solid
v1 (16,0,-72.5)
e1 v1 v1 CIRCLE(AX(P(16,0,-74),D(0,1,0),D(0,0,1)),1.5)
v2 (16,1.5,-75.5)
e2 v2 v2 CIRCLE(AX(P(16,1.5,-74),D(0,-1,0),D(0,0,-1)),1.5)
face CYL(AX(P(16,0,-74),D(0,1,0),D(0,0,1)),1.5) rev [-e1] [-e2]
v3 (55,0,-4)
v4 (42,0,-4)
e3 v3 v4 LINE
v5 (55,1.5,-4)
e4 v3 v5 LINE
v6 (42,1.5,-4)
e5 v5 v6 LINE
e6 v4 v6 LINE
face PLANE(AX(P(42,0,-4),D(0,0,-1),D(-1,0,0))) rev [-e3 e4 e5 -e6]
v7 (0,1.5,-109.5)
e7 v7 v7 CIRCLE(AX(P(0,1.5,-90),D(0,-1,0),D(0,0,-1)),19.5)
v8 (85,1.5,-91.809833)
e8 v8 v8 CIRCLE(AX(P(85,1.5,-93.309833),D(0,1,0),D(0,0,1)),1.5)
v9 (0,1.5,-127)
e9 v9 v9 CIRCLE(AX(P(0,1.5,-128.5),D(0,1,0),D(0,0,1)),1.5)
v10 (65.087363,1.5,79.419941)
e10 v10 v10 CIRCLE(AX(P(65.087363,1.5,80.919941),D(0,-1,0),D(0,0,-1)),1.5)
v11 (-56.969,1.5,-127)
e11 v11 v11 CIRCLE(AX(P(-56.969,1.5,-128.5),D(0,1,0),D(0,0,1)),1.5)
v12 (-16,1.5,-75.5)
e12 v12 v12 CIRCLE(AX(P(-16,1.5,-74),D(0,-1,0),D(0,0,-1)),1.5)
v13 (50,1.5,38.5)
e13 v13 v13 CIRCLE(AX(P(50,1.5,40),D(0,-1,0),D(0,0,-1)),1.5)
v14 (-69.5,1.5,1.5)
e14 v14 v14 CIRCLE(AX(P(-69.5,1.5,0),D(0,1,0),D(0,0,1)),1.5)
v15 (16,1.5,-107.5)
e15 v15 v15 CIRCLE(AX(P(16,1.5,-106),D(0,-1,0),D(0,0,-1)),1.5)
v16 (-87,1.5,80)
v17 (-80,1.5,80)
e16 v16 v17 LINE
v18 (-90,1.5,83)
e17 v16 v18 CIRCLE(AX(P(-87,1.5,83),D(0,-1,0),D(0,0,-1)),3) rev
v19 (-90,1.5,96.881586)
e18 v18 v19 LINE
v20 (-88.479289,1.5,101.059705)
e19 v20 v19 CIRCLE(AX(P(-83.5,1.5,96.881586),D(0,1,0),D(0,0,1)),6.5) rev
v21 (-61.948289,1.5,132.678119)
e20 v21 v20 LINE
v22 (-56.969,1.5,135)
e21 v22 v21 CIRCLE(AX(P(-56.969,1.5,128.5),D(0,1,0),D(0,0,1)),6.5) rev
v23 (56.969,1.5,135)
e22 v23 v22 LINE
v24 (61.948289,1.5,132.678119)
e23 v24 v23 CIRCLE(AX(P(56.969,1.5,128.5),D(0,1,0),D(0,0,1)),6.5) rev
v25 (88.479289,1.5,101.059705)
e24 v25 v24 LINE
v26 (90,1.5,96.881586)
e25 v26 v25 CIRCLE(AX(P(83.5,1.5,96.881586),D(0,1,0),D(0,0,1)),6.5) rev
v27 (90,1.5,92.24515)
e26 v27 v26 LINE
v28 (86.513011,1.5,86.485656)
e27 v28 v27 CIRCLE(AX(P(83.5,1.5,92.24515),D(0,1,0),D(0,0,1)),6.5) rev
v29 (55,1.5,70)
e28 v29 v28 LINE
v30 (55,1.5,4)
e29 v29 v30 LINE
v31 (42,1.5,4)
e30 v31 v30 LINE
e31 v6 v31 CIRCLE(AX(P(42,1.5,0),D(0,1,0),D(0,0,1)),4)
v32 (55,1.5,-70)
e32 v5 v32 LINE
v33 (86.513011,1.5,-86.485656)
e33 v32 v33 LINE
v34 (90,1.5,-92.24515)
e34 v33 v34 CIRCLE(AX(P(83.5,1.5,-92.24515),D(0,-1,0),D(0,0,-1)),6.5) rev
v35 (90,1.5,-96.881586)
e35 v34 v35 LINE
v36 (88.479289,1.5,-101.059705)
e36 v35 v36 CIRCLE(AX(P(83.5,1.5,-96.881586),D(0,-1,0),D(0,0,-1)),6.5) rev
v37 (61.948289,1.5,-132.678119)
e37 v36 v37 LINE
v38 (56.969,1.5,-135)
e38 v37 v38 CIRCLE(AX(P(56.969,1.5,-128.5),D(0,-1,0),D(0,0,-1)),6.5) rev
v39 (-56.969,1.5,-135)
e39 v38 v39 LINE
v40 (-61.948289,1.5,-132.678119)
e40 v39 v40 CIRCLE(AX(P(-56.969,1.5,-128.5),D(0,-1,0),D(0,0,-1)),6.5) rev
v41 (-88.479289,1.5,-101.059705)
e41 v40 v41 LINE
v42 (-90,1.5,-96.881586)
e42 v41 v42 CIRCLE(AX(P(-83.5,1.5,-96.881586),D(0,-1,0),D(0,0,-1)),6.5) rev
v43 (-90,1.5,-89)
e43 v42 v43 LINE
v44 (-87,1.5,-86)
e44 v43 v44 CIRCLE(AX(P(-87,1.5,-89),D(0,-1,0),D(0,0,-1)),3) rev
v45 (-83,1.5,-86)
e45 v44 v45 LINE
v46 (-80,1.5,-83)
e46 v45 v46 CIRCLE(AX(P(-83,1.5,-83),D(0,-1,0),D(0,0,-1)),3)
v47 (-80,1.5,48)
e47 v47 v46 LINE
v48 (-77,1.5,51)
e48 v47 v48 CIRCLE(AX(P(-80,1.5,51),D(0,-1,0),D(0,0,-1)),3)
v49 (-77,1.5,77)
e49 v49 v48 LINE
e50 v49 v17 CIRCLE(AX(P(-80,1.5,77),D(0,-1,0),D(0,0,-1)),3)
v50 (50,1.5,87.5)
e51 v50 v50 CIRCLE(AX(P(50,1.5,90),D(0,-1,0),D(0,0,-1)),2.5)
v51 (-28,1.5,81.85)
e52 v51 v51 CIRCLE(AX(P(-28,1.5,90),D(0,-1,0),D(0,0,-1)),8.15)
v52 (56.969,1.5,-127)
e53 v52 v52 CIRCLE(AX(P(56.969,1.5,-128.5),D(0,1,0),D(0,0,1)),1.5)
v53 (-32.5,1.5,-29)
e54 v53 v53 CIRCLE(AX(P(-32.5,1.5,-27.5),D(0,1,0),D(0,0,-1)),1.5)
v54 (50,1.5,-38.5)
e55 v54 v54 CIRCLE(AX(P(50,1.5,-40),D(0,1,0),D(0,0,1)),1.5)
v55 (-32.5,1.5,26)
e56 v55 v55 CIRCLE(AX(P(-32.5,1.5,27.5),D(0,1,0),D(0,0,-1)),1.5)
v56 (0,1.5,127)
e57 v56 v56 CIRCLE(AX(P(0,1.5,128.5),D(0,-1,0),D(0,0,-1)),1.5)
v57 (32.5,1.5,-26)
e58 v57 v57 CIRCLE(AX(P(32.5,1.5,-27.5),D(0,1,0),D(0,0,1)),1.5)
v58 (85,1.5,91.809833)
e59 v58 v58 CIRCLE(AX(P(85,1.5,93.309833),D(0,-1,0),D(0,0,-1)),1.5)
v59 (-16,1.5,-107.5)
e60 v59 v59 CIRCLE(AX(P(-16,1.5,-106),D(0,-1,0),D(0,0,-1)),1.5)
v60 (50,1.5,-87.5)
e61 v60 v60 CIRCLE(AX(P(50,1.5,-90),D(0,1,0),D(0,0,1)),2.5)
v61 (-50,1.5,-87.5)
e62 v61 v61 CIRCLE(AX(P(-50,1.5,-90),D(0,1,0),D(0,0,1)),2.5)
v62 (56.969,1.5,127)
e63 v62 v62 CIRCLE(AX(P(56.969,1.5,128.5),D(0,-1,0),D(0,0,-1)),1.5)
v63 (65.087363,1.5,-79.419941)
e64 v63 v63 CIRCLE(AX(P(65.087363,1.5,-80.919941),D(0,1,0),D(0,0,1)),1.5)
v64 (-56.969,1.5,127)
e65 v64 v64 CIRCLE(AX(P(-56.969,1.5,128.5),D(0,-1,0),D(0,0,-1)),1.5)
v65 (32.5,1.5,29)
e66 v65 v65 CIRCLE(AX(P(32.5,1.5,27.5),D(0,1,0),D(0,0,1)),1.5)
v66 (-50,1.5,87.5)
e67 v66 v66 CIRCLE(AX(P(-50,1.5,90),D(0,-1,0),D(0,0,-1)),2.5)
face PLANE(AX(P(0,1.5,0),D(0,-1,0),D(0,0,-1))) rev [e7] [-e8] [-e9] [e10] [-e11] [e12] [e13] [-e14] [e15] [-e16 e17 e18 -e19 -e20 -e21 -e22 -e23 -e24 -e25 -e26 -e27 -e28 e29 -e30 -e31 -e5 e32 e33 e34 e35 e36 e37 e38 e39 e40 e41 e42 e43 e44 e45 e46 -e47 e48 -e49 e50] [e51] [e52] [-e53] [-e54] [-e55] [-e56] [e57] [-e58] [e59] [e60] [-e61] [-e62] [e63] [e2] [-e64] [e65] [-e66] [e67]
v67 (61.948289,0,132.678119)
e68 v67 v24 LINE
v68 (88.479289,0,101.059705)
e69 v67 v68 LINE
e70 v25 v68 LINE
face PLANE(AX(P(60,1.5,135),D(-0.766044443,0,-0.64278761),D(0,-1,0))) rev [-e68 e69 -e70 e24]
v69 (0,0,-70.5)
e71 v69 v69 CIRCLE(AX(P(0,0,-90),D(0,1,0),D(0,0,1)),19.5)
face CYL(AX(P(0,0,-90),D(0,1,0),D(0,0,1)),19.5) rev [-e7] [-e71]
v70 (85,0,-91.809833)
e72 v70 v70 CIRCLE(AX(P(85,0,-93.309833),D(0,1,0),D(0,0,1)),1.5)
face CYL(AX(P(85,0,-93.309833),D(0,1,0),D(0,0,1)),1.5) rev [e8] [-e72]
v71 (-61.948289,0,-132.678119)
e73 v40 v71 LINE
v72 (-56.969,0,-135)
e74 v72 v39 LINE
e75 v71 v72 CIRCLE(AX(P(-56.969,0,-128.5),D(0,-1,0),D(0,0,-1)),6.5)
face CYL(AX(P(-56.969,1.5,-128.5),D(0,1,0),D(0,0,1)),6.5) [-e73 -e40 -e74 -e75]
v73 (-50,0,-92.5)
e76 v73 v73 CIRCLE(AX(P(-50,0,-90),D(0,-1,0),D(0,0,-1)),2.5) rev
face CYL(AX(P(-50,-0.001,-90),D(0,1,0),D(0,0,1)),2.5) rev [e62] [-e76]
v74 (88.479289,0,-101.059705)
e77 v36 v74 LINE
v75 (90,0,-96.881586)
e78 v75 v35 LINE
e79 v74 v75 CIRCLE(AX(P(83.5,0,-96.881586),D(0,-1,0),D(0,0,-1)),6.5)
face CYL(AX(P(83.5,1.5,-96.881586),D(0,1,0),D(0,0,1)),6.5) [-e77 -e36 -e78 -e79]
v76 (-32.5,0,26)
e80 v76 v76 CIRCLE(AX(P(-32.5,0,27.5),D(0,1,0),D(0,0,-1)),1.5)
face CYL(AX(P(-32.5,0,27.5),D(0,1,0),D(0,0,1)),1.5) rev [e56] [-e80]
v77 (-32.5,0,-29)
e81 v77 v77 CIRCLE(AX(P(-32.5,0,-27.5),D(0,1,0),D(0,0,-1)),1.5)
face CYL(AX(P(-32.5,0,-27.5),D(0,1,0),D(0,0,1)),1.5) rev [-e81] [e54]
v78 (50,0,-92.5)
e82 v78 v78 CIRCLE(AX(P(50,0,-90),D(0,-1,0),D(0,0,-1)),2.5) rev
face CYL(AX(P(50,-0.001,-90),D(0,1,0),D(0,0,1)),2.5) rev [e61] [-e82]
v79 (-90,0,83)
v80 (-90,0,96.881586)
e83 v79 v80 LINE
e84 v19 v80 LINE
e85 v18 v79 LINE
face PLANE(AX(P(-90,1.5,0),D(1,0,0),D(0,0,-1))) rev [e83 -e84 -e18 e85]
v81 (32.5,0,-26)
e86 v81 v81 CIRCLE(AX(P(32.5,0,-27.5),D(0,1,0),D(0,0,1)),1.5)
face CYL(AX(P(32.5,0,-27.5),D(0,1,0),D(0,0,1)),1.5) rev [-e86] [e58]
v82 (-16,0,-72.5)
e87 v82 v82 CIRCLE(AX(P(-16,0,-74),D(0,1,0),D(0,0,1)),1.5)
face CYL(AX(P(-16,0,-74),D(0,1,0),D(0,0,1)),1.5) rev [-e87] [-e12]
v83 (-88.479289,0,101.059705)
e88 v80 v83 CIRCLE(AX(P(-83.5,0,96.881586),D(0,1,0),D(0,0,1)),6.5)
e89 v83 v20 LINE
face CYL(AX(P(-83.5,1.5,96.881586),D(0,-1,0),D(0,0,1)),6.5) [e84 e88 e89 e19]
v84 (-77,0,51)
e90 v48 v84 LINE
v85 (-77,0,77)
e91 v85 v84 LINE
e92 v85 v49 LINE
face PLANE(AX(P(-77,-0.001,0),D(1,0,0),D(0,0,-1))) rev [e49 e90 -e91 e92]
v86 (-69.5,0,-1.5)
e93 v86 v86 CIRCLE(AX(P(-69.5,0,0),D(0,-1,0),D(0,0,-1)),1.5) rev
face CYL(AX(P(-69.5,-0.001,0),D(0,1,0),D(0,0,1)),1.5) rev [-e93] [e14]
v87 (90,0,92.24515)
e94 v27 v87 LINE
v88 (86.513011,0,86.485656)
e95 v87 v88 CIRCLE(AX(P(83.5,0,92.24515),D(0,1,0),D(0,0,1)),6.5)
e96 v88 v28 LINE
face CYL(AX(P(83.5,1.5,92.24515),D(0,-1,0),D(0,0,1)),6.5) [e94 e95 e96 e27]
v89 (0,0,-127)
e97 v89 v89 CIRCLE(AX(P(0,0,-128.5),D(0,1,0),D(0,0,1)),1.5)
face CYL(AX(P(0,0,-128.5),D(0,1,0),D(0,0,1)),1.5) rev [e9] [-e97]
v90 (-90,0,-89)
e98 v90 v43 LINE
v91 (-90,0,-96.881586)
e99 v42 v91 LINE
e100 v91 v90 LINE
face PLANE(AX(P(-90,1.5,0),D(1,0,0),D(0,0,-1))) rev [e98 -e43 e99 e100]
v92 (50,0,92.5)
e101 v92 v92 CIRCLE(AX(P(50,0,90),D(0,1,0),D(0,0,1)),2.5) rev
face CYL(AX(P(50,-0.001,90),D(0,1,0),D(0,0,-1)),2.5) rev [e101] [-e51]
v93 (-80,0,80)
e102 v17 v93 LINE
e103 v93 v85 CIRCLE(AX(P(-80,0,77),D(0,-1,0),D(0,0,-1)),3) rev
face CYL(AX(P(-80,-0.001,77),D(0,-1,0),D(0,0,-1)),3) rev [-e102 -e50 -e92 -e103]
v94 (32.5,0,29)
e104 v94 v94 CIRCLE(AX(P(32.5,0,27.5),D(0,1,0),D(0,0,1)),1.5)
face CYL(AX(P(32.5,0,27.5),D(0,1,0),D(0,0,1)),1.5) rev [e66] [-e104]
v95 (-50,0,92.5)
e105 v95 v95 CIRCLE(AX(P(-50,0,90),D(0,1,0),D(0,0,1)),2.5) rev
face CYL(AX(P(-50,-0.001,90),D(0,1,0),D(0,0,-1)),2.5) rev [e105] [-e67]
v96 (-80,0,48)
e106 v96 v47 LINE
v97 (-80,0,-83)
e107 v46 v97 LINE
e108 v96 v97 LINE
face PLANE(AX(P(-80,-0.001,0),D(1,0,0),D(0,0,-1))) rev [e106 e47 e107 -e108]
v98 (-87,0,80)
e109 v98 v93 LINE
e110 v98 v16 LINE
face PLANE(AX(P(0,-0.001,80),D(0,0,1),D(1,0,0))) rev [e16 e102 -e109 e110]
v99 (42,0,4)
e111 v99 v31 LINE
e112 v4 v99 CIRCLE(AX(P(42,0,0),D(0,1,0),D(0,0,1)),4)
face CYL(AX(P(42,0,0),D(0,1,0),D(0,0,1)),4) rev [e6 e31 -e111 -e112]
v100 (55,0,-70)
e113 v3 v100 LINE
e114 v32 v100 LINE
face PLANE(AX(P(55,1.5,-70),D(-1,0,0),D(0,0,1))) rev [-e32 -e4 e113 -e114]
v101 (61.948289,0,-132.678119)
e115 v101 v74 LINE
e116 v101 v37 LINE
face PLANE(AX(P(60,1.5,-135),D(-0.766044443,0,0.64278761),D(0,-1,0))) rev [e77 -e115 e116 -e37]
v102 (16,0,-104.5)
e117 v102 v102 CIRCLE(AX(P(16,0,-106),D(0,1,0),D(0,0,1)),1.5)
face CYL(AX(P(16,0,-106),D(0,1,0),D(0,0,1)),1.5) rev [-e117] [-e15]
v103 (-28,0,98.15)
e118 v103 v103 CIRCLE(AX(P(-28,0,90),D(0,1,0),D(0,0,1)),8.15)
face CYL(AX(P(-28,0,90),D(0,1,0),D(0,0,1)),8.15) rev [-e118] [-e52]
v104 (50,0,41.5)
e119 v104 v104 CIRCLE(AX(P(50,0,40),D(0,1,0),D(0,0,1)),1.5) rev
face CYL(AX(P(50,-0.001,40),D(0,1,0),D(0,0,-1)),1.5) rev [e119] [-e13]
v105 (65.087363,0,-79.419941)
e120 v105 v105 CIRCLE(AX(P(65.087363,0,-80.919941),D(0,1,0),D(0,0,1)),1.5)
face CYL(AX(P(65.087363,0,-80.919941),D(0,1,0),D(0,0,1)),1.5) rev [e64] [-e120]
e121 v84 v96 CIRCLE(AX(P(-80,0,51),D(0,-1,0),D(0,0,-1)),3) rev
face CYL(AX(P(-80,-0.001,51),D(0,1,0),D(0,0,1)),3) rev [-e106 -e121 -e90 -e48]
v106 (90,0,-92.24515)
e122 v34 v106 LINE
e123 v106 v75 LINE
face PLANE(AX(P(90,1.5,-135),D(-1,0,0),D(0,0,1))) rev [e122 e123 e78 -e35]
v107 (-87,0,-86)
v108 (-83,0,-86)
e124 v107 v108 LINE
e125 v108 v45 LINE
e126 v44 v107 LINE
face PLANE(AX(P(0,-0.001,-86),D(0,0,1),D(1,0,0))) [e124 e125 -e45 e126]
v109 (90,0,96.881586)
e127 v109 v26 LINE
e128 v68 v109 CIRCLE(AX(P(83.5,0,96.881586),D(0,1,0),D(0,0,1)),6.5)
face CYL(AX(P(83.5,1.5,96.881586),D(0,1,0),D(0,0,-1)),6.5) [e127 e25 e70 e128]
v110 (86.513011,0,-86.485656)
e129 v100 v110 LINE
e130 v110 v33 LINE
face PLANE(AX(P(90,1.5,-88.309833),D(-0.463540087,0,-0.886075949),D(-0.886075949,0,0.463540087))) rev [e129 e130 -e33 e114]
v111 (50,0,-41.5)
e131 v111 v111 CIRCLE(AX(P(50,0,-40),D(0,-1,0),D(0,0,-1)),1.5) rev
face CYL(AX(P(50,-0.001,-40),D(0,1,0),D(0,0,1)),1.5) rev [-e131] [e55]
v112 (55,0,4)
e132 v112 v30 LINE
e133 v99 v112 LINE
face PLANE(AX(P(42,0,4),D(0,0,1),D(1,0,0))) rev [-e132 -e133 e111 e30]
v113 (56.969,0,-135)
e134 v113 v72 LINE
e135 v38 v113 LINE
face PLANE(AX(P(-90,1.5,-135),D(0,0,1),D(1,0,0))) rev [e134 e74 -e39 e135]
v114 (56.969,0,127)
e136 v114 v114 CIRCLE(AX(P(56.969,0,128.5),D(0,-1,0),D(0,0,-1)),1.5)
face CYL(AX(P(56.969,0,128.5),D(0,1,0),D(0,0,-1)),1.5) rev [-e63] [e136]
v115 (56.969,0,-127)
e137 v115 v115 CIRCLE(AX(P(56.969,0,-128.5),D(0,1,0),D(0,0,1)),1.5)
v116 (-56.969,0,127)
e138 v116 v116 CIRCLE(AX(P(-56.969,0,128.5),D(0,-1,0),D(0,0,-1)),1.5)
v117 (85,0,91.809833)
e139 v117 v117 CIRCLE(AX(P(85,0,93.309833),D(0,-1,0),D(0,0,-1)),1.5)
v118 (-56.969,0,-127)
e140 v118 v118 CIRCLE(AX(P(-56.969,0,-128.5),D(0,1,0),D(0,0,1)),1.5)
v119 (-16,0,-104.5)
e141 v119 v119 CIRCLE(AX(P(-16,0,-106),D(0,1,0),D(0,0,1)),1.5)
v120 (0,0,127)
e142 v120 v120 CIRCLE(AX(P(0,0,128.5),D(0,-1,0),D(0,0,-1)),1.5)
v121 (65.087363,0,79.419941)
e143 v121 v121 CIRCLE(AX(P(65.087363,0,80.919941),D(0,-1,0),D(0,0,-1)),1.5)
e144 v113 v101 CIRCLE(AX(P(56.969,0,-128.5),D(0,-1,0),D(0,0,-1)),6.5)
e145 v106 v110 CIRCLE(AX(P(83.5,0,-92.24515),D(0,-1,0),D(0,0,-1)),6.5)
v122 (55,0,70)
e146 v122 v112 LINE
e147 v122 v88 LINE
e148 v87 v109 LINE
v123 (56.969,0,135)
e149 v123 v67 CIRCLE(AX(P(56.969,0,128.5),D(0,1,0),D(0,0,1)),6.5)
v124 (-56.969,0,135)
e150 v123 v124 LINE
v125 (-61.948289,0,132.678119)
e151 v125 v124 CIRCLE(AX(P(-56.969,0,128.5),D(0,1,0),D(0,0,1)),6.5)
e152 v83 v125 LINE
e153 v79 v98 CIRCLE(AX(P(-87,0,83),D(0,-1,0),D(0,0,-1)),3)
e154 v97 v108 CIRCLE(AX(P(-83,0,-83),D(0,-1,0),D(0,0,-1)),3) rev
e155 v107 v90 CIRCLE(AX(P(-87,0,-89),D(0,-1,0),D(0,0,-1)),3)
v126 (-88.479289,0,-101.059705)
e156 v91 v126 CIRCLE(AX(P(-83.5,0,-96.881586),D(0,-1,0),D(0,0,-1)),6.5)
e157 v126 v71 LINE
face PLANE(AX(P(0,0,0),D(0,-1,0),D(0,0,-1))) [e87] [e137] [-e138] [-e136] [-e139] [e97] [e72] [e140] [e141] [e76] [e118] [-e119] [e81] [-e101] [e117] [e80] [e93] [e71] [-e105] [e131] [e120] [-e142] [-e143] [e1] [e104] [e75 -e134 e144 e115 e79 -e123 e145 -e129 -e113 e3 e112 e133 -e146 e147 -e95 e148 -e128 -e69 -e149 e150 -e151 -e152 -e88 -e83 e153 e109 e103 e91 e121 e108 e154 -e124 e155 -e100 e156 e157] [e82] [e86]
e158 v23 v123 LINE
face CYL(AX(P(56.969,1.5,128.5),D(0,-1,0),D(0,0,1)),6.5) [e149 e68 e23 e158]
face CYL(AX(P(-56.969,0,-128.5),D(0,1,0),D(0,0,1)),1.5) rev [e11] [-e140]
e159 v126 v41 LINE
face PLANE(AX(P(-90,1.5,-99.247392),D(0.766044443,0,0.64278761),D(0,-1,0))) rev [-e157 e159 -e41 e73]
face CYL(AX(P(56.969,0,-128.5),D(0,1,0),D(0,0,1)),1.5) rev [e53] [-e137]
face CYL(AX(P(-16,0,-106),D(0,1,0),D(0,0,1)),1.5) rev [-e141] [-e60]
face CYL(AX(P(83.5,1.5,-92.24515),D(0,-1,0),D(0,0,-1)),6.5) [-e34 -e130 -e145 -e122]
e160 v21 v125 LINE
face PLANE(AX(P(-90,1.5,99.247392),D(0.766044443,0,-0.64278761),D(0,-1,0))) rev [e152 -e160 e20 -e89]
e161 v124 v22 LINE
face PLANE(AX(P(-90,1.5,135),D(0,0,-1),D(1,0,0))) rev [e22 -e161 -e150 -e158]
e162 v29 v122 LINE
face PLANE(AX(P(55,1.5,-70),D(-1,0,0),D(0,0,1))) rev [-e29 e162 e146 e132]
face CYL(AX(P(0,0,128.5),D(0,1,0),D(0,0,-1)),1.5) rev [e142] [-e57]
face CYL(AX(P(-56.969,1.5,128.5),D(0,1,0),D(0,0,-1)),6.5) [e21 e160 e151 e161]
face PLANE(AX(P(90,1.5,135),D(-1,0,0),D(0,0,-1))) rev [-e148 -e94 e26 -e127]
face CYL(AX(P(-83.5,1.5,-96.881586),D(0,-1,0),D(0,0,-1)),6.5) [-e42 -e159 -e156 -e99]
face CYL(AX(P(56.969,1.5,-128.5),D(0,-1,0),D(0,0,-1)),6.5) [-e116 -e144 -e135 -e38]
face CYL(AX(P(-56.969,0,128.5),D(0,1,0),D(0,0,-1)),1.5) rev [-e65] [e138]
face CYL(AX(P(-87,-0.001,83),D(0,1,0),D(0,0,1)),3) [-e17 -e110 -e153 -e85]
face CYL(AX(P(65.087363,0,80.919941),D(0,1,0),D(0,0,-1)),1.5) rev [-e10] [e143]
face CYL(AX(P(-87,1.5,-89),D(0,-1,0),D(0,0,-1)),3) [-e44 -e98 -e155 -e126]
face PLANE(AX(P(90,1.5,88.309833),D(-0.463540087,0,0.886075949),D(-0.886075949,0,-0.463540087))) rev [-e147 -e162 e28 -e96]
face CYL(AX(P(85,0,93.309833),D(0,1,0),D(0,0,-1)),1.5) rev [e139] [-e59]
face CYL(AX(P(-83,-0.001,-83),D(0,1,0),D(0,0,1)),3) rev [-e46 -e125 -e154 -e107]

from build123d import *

# Parameters (mm, degrees)
BOSS_EXTRU_1_DEPTH           = 1.5
CHANFREIN1_SIZE              = 30
CHANFREIN1_SIZE2             = 35.752607778
ENL_V_MAT_EXTRU_1_REACH      = 164.257
ESQUISSE2_R                  = 2.5
ESQUISSE2_R_2                = 1.5
ESQUISSE5_R                  = 1.5
ENL_V_MAT_EXTRU_4_DEPTH      = 163.256741
CONG_2_R                     = 6.5
ESQUISSE3_R                  = 1.5
ENL_V_MAT_EXTRU_2_DEPTH      = 163.256741
ENL_V_MAT_EXTRU_3_DEPTH      = 163.256741
ENL_V_MAT_EXTRU_3_DEPTH_BACK = 163.256741
ESQUISSE4_R                  = 8.15
ESQUISSE4_R_2                = 19.5
ESQUISSE4_R_3                = 1.5
ENL_V_MAT_EXTRU_5_REACH      = 164.257
ESQUISSE6_W                  = 3
ESQUISSE6_H                  = 32
ESQUISSE6_R                  = 1.5
CONG_1_R                     = 3


with BuildPart() as part:
    # Esquisse1 → Boss.-Extru.1 (new body)
    with BuildSketch(Plane(origin=(0, 0, 0), x_dir=(1, 0, 0), z_dir=(0, 1, 0))):
        Polygon((-90, 135), (90, 135), (90, 88.309833424), (55, 70), (55, 0), (-90, 0), align=None)
    extrude(amount=BOSS_EXTRU_1_DEPTH)

    # Chanfrein1
    chanfrein1_edges = [part.edges().sort_by_distance(p)[0] for p in [
        (-90, 0.75, -135),
        (90, 0.75, -135),
    ]]
    chanfrein1_side = [part.faces().sort_by_distance(p)[0] for p in [
        (0, 0.75, -135),
    ]]
    chamfer(chanfrein1_edges, length=CHANFREIN1_SIZE, length2=CHANFREIN1_SIZE2, reference=chanfrein1_side[0])

    # Esquisse2 → Enlèv. mat.-Extru.1 (cut, up to next)
    with BuildSketch(Plane(origin=(0, 1.5, 0), x_dir=(1, 0, 0), z_dir=(0, 1, 0)), mode=Mode.PRIVATE) as enl_v_mat_extru_1_sk1:
        with Locations(Location((-50, 90, 0), (0, 0, 270))):
            Circle(ESQUISSE2_R)
    enl_v_mat_extru_1_tool1 = extrude(enl_v_mat_extru_1_sk1.sketch, amount=-ENL_V_MAT_EXTRU_1_REACH, mode=Mode.PRIVATE) & part.part
    # Esquisse2 → Enlèv. mat.-Extru.1 (cut, up to next)
    with BuildSketch(Plane(origin=(0, 1.5, 0), x_dir=(1, 0, 0), z_dir=(0, 1, 0)), mode=Mode.PRIVATE) as enl_v_mat_extru_1_sk2:
        with Locations(Location((50, 90, 0), (0, 0, 270))):
            Circle(ESQUISSE2_R)
    enl_v_mat_extru_1_tool2 = extrude(enl_v_mat_extru_1_sk2.sketch, amount=-ENL_V_MAT_EXTRU_1_REACH, mode=Mode.PRIVATE) & part.part
    # Esquisse2 → Enlèv. mat.-Extru.1 (cut, up to next)
    with BuildSketch(Plane(origin=(0, 1.5, 0), x_dir=(1, 0, 0), z_dir=(0, 1, 0)), mode=Mode.PRIVATE) as enl_v_mat_extru_1_sk3:
        with Locations(Location((50, 40, 0), (0, 0, 270))):
            Circle(ESQUISSE2_R_2)
    enl_v_mat_extru_1_tool3 = extrude(enl_v_mat_extru_1_sk3.sketch, amount=-ENL_V_MAT_EXTRU_1_REACH, mode=Mode.PRIVATE) & part.part
    add(enl_v_mat_extru_1_tool1.solids().sort_by_distance((-50, 1.5, -90))[0], mode=Mode.SUBTRACT)
    add(enl_v_mat_extru_1_tool2.solids().sort_by_distance((50, 1.5, -90))[0], mode=Mode.SUBTRACT)
    add(enl_v_mat_extru_1_tool3.solids().sort_by_distance((50, 1.5, -40))[0], mode=Mode.SUBTRACT)

    # Esquisse5 → Enlèv. mat.-Extru.4 (cut, through all)
    with BuildSketch(Plane(origin=(0, 1.5, 0), x_dir=(1, 0, 0), z_dir=(0, 1, 0))):
        with Locations(Location((85, 93.309833424, 0), (0, 0, 270))):
            Circle(ESQUISSE5_R)
        with Locations(Location((65.087362858, 80.91994096, 0), (0, 0, 270))):
            Circle(ESQUISSE5_R)
        with Locations(Location((-56.969000222, 128.5, 0), (0, 0, 270))):
            Circle(ESQUISSE5_R)
        with Locations(Location((0, 128.5, 0), (0, 0, 270))):
            Circle(ESQUISSE5_R)
        with Locations(Location((56.969000222, 128.5, 0), (0, 0, 270))):
            Circle(ESQUISSE5_R)
    extrude(amount=-ENL_V_MAT_EXTRU_4_DEPTH, mode=Mode.SUBTRACT)

    # Congé2
    cong_2_edges = [part.edges().sort_by_distance(p)[0] for p in [
        (90, 0.75, -88.309833424),
        (-60, 0.75, -135),
        (60, 0.75, -135),
        (90, 0.75, -99.247392222),
        (-90, 0.75, -99.247392222),
    ]]
    fillet(cong_2_edges, radius=CONG_2_R)

    # Symétrie1: part across plane


with BuildPart() as part_1:
    add(part.part)
    add(part.part.mirror(Plane(origin=(55, 1.5, 0), x_dir=(1, 0, 0), z_dir=(0, 0, -1))))

    # Esquisse3 → Enlèv. mat.-Extru.2 (cut, through all)
    with BuildSketch(Plane(origin=(0, 1.5, 0), x_dir=(1, 0, 0), z_dir=(0, 1, 0))):
        with Locations(Location((32.5, -27.5, 0), (0, 0, 270))):
            Circle(ESQUISSE3_R)
        with Locations(Location((32.5, 27.5, 0), (0, 0, 270))):
            Circle(ESQUISSE3_R)
        with Locations(Location((-32.5, -27.5, 0), (0, 0, 90))):
            Circle(ESQUISSE3_R)
        with Locations(Location((-32.5, 27.5, 0), (0, 0, 90))):
            Circle(ESQUISSE3_R)
        with BuildLine():
            Line((42, 4), (55, 4))
            ThreePointArc((55, 4), (59, 0), (55, -4))
            Line((55, -4), (42, -4))
            ThreePointArc((42, -4), (38, 0), (42, 4))
        make_face()
    extrude(amount=-ENL_V_MAT_EXTRU_2_DEPTH, mode=Mode.SUBTRACT)

    # Esquisse4 → Enlèv. mat.-Extru.3 (cut, two sides: drawn at the far end of the back side and taken through both)
    with BuildSketch(Plane(origin=(0, 1.5, 0), x_dir=(1, 0, 0), z_dir=(0, 1, 0)).offset(-ENL_V_MAT_EXTRU_3_DEPTH_BACK)):
        with Locations(Location((-28, -90, 0), (0, 0, 270))):
            Circle(ESQUISSE4_R)
        with Locations(Location((0, 90, 0), (0, 0, 270))):
            Circle(ESQUISSE4_R_2)
        with Locations(Location((16, 106, 0), (0, 0, 270))):
            Circle(ESQUISSE4_R_3)
        with Locations(Location((-16, 106, 0), (0, 0, 270))):
            Circle(ESQUISSE4_R_3)
        with Locations(Location((-16, 74, 0), (0, 0, 270))):
            Circle(ESQUISSE4_R_3)
        with Locations(Location((16, 74, 0), (0, 0, 270))):
            Circle(ESQUISSE4_R_3)
    extrude(amount=ENL_V_MAT_EXTRU_3_DEPTH + ENL_V_MAT_EXTRU_3_DEPTH_BACK, mode=Mode.SUBTRACT)

    # Esquisse6 → Enlèv. mat.-Extru.5 (cut, up to next)
    with BuildSketch(Plane(origin=(0, 1.5, 0), x_dir=(1, 0, 0), z_dir=(0, 1, 0)), mode=Mode.PRIVATE) as enl_v_mat_extru_5_sk1:
        Polygon((-90, 86), (-90, -80), (-80, -80), (-80, -48), (-80, 86), align=None)
    enl_v_mat_extru_5_tool1 = extrude(enl_v_mat_extru_5_sk1.sketch, amount=-ENL_V_MAT_EXTRU_5_REACH, mode=Mode.PRIVATE) & part_1.part
    # Esquisse6 → Enlèv. mat.-Extru.5 (cut, up to next)
    with BuildSketch(Plane(origin=(0, 1.5, 0), x_dir=(1, 0, 0), z_dir=(0, 1, 0)), mode=Mode.PRIVATE) as enl_v_mat_extru_5_sk2:
        with Locations((-78.5, -64)):
            Rectangle(ESQUISSE6_W, ESQUISSE6_H)
    enl_v_mat_extru_5_tool2 = extrude(enl_v_mat_extru_5_sk2.sketch, amount=-ENL_V_MAT_EXTRU_5_REACH, mode=Mode.PRIVATE) & part_1.part
    # Esquisse6 → Enlèv. mat.-Extru.5 (cut, up to next)
    with BuildSketch(Plane(origin=(0, 1.5, 0), x_dir=(1, 0, 0), z_dir=(0, 1, 0)), mode=Mode.PRIVATE) as enl_v_mat_extru_5_sk3:
        with Locations(Location((-69.5, 0, 0), (0, 0, 270))):
            Circle(ESQUISSE6_R)
    enl_v_mat_extru_5_tool3 = extrude(enl_v_mat_extru_5_sk3.sketch, amount=-ENL_V_MAT_EXTRU_5_REACH, mode=Mode.PRIVATE) & part_1.part
    add(enl_v_mat_extru_5_tool1.solids().sort_by_distance((-85, 1.5, -3))[0], mode=Mode.SUBTRACT)
    add(enl_v_mat_extru_5_tool2.solids().sort_by_distance((-78.5, 1.5, 64))[0], mode=Mode.SUBTRACT)
    add(enl_v_mat_extru_5_tool3.solids().sort_by_distance((-69.5, 1.5, 0))[0], mode=Mode.SUBTRACT)

    # Congé1
    cong_1_edges = [part_1.edges().sort_by_distance(p)[0] for p in [
        (-77, 0.75, 80),
        (-77, 0.75, 48),
        (-80, 0.75, -86),
        (-90, 0.75, 80),
        (-90, 0.75, -86),
    ]]
    fillet(cong_1_edges, radius=CONG_1_R - 0.0001)  # a hair under: the kernel refuses the full size


solid = part_1.part
